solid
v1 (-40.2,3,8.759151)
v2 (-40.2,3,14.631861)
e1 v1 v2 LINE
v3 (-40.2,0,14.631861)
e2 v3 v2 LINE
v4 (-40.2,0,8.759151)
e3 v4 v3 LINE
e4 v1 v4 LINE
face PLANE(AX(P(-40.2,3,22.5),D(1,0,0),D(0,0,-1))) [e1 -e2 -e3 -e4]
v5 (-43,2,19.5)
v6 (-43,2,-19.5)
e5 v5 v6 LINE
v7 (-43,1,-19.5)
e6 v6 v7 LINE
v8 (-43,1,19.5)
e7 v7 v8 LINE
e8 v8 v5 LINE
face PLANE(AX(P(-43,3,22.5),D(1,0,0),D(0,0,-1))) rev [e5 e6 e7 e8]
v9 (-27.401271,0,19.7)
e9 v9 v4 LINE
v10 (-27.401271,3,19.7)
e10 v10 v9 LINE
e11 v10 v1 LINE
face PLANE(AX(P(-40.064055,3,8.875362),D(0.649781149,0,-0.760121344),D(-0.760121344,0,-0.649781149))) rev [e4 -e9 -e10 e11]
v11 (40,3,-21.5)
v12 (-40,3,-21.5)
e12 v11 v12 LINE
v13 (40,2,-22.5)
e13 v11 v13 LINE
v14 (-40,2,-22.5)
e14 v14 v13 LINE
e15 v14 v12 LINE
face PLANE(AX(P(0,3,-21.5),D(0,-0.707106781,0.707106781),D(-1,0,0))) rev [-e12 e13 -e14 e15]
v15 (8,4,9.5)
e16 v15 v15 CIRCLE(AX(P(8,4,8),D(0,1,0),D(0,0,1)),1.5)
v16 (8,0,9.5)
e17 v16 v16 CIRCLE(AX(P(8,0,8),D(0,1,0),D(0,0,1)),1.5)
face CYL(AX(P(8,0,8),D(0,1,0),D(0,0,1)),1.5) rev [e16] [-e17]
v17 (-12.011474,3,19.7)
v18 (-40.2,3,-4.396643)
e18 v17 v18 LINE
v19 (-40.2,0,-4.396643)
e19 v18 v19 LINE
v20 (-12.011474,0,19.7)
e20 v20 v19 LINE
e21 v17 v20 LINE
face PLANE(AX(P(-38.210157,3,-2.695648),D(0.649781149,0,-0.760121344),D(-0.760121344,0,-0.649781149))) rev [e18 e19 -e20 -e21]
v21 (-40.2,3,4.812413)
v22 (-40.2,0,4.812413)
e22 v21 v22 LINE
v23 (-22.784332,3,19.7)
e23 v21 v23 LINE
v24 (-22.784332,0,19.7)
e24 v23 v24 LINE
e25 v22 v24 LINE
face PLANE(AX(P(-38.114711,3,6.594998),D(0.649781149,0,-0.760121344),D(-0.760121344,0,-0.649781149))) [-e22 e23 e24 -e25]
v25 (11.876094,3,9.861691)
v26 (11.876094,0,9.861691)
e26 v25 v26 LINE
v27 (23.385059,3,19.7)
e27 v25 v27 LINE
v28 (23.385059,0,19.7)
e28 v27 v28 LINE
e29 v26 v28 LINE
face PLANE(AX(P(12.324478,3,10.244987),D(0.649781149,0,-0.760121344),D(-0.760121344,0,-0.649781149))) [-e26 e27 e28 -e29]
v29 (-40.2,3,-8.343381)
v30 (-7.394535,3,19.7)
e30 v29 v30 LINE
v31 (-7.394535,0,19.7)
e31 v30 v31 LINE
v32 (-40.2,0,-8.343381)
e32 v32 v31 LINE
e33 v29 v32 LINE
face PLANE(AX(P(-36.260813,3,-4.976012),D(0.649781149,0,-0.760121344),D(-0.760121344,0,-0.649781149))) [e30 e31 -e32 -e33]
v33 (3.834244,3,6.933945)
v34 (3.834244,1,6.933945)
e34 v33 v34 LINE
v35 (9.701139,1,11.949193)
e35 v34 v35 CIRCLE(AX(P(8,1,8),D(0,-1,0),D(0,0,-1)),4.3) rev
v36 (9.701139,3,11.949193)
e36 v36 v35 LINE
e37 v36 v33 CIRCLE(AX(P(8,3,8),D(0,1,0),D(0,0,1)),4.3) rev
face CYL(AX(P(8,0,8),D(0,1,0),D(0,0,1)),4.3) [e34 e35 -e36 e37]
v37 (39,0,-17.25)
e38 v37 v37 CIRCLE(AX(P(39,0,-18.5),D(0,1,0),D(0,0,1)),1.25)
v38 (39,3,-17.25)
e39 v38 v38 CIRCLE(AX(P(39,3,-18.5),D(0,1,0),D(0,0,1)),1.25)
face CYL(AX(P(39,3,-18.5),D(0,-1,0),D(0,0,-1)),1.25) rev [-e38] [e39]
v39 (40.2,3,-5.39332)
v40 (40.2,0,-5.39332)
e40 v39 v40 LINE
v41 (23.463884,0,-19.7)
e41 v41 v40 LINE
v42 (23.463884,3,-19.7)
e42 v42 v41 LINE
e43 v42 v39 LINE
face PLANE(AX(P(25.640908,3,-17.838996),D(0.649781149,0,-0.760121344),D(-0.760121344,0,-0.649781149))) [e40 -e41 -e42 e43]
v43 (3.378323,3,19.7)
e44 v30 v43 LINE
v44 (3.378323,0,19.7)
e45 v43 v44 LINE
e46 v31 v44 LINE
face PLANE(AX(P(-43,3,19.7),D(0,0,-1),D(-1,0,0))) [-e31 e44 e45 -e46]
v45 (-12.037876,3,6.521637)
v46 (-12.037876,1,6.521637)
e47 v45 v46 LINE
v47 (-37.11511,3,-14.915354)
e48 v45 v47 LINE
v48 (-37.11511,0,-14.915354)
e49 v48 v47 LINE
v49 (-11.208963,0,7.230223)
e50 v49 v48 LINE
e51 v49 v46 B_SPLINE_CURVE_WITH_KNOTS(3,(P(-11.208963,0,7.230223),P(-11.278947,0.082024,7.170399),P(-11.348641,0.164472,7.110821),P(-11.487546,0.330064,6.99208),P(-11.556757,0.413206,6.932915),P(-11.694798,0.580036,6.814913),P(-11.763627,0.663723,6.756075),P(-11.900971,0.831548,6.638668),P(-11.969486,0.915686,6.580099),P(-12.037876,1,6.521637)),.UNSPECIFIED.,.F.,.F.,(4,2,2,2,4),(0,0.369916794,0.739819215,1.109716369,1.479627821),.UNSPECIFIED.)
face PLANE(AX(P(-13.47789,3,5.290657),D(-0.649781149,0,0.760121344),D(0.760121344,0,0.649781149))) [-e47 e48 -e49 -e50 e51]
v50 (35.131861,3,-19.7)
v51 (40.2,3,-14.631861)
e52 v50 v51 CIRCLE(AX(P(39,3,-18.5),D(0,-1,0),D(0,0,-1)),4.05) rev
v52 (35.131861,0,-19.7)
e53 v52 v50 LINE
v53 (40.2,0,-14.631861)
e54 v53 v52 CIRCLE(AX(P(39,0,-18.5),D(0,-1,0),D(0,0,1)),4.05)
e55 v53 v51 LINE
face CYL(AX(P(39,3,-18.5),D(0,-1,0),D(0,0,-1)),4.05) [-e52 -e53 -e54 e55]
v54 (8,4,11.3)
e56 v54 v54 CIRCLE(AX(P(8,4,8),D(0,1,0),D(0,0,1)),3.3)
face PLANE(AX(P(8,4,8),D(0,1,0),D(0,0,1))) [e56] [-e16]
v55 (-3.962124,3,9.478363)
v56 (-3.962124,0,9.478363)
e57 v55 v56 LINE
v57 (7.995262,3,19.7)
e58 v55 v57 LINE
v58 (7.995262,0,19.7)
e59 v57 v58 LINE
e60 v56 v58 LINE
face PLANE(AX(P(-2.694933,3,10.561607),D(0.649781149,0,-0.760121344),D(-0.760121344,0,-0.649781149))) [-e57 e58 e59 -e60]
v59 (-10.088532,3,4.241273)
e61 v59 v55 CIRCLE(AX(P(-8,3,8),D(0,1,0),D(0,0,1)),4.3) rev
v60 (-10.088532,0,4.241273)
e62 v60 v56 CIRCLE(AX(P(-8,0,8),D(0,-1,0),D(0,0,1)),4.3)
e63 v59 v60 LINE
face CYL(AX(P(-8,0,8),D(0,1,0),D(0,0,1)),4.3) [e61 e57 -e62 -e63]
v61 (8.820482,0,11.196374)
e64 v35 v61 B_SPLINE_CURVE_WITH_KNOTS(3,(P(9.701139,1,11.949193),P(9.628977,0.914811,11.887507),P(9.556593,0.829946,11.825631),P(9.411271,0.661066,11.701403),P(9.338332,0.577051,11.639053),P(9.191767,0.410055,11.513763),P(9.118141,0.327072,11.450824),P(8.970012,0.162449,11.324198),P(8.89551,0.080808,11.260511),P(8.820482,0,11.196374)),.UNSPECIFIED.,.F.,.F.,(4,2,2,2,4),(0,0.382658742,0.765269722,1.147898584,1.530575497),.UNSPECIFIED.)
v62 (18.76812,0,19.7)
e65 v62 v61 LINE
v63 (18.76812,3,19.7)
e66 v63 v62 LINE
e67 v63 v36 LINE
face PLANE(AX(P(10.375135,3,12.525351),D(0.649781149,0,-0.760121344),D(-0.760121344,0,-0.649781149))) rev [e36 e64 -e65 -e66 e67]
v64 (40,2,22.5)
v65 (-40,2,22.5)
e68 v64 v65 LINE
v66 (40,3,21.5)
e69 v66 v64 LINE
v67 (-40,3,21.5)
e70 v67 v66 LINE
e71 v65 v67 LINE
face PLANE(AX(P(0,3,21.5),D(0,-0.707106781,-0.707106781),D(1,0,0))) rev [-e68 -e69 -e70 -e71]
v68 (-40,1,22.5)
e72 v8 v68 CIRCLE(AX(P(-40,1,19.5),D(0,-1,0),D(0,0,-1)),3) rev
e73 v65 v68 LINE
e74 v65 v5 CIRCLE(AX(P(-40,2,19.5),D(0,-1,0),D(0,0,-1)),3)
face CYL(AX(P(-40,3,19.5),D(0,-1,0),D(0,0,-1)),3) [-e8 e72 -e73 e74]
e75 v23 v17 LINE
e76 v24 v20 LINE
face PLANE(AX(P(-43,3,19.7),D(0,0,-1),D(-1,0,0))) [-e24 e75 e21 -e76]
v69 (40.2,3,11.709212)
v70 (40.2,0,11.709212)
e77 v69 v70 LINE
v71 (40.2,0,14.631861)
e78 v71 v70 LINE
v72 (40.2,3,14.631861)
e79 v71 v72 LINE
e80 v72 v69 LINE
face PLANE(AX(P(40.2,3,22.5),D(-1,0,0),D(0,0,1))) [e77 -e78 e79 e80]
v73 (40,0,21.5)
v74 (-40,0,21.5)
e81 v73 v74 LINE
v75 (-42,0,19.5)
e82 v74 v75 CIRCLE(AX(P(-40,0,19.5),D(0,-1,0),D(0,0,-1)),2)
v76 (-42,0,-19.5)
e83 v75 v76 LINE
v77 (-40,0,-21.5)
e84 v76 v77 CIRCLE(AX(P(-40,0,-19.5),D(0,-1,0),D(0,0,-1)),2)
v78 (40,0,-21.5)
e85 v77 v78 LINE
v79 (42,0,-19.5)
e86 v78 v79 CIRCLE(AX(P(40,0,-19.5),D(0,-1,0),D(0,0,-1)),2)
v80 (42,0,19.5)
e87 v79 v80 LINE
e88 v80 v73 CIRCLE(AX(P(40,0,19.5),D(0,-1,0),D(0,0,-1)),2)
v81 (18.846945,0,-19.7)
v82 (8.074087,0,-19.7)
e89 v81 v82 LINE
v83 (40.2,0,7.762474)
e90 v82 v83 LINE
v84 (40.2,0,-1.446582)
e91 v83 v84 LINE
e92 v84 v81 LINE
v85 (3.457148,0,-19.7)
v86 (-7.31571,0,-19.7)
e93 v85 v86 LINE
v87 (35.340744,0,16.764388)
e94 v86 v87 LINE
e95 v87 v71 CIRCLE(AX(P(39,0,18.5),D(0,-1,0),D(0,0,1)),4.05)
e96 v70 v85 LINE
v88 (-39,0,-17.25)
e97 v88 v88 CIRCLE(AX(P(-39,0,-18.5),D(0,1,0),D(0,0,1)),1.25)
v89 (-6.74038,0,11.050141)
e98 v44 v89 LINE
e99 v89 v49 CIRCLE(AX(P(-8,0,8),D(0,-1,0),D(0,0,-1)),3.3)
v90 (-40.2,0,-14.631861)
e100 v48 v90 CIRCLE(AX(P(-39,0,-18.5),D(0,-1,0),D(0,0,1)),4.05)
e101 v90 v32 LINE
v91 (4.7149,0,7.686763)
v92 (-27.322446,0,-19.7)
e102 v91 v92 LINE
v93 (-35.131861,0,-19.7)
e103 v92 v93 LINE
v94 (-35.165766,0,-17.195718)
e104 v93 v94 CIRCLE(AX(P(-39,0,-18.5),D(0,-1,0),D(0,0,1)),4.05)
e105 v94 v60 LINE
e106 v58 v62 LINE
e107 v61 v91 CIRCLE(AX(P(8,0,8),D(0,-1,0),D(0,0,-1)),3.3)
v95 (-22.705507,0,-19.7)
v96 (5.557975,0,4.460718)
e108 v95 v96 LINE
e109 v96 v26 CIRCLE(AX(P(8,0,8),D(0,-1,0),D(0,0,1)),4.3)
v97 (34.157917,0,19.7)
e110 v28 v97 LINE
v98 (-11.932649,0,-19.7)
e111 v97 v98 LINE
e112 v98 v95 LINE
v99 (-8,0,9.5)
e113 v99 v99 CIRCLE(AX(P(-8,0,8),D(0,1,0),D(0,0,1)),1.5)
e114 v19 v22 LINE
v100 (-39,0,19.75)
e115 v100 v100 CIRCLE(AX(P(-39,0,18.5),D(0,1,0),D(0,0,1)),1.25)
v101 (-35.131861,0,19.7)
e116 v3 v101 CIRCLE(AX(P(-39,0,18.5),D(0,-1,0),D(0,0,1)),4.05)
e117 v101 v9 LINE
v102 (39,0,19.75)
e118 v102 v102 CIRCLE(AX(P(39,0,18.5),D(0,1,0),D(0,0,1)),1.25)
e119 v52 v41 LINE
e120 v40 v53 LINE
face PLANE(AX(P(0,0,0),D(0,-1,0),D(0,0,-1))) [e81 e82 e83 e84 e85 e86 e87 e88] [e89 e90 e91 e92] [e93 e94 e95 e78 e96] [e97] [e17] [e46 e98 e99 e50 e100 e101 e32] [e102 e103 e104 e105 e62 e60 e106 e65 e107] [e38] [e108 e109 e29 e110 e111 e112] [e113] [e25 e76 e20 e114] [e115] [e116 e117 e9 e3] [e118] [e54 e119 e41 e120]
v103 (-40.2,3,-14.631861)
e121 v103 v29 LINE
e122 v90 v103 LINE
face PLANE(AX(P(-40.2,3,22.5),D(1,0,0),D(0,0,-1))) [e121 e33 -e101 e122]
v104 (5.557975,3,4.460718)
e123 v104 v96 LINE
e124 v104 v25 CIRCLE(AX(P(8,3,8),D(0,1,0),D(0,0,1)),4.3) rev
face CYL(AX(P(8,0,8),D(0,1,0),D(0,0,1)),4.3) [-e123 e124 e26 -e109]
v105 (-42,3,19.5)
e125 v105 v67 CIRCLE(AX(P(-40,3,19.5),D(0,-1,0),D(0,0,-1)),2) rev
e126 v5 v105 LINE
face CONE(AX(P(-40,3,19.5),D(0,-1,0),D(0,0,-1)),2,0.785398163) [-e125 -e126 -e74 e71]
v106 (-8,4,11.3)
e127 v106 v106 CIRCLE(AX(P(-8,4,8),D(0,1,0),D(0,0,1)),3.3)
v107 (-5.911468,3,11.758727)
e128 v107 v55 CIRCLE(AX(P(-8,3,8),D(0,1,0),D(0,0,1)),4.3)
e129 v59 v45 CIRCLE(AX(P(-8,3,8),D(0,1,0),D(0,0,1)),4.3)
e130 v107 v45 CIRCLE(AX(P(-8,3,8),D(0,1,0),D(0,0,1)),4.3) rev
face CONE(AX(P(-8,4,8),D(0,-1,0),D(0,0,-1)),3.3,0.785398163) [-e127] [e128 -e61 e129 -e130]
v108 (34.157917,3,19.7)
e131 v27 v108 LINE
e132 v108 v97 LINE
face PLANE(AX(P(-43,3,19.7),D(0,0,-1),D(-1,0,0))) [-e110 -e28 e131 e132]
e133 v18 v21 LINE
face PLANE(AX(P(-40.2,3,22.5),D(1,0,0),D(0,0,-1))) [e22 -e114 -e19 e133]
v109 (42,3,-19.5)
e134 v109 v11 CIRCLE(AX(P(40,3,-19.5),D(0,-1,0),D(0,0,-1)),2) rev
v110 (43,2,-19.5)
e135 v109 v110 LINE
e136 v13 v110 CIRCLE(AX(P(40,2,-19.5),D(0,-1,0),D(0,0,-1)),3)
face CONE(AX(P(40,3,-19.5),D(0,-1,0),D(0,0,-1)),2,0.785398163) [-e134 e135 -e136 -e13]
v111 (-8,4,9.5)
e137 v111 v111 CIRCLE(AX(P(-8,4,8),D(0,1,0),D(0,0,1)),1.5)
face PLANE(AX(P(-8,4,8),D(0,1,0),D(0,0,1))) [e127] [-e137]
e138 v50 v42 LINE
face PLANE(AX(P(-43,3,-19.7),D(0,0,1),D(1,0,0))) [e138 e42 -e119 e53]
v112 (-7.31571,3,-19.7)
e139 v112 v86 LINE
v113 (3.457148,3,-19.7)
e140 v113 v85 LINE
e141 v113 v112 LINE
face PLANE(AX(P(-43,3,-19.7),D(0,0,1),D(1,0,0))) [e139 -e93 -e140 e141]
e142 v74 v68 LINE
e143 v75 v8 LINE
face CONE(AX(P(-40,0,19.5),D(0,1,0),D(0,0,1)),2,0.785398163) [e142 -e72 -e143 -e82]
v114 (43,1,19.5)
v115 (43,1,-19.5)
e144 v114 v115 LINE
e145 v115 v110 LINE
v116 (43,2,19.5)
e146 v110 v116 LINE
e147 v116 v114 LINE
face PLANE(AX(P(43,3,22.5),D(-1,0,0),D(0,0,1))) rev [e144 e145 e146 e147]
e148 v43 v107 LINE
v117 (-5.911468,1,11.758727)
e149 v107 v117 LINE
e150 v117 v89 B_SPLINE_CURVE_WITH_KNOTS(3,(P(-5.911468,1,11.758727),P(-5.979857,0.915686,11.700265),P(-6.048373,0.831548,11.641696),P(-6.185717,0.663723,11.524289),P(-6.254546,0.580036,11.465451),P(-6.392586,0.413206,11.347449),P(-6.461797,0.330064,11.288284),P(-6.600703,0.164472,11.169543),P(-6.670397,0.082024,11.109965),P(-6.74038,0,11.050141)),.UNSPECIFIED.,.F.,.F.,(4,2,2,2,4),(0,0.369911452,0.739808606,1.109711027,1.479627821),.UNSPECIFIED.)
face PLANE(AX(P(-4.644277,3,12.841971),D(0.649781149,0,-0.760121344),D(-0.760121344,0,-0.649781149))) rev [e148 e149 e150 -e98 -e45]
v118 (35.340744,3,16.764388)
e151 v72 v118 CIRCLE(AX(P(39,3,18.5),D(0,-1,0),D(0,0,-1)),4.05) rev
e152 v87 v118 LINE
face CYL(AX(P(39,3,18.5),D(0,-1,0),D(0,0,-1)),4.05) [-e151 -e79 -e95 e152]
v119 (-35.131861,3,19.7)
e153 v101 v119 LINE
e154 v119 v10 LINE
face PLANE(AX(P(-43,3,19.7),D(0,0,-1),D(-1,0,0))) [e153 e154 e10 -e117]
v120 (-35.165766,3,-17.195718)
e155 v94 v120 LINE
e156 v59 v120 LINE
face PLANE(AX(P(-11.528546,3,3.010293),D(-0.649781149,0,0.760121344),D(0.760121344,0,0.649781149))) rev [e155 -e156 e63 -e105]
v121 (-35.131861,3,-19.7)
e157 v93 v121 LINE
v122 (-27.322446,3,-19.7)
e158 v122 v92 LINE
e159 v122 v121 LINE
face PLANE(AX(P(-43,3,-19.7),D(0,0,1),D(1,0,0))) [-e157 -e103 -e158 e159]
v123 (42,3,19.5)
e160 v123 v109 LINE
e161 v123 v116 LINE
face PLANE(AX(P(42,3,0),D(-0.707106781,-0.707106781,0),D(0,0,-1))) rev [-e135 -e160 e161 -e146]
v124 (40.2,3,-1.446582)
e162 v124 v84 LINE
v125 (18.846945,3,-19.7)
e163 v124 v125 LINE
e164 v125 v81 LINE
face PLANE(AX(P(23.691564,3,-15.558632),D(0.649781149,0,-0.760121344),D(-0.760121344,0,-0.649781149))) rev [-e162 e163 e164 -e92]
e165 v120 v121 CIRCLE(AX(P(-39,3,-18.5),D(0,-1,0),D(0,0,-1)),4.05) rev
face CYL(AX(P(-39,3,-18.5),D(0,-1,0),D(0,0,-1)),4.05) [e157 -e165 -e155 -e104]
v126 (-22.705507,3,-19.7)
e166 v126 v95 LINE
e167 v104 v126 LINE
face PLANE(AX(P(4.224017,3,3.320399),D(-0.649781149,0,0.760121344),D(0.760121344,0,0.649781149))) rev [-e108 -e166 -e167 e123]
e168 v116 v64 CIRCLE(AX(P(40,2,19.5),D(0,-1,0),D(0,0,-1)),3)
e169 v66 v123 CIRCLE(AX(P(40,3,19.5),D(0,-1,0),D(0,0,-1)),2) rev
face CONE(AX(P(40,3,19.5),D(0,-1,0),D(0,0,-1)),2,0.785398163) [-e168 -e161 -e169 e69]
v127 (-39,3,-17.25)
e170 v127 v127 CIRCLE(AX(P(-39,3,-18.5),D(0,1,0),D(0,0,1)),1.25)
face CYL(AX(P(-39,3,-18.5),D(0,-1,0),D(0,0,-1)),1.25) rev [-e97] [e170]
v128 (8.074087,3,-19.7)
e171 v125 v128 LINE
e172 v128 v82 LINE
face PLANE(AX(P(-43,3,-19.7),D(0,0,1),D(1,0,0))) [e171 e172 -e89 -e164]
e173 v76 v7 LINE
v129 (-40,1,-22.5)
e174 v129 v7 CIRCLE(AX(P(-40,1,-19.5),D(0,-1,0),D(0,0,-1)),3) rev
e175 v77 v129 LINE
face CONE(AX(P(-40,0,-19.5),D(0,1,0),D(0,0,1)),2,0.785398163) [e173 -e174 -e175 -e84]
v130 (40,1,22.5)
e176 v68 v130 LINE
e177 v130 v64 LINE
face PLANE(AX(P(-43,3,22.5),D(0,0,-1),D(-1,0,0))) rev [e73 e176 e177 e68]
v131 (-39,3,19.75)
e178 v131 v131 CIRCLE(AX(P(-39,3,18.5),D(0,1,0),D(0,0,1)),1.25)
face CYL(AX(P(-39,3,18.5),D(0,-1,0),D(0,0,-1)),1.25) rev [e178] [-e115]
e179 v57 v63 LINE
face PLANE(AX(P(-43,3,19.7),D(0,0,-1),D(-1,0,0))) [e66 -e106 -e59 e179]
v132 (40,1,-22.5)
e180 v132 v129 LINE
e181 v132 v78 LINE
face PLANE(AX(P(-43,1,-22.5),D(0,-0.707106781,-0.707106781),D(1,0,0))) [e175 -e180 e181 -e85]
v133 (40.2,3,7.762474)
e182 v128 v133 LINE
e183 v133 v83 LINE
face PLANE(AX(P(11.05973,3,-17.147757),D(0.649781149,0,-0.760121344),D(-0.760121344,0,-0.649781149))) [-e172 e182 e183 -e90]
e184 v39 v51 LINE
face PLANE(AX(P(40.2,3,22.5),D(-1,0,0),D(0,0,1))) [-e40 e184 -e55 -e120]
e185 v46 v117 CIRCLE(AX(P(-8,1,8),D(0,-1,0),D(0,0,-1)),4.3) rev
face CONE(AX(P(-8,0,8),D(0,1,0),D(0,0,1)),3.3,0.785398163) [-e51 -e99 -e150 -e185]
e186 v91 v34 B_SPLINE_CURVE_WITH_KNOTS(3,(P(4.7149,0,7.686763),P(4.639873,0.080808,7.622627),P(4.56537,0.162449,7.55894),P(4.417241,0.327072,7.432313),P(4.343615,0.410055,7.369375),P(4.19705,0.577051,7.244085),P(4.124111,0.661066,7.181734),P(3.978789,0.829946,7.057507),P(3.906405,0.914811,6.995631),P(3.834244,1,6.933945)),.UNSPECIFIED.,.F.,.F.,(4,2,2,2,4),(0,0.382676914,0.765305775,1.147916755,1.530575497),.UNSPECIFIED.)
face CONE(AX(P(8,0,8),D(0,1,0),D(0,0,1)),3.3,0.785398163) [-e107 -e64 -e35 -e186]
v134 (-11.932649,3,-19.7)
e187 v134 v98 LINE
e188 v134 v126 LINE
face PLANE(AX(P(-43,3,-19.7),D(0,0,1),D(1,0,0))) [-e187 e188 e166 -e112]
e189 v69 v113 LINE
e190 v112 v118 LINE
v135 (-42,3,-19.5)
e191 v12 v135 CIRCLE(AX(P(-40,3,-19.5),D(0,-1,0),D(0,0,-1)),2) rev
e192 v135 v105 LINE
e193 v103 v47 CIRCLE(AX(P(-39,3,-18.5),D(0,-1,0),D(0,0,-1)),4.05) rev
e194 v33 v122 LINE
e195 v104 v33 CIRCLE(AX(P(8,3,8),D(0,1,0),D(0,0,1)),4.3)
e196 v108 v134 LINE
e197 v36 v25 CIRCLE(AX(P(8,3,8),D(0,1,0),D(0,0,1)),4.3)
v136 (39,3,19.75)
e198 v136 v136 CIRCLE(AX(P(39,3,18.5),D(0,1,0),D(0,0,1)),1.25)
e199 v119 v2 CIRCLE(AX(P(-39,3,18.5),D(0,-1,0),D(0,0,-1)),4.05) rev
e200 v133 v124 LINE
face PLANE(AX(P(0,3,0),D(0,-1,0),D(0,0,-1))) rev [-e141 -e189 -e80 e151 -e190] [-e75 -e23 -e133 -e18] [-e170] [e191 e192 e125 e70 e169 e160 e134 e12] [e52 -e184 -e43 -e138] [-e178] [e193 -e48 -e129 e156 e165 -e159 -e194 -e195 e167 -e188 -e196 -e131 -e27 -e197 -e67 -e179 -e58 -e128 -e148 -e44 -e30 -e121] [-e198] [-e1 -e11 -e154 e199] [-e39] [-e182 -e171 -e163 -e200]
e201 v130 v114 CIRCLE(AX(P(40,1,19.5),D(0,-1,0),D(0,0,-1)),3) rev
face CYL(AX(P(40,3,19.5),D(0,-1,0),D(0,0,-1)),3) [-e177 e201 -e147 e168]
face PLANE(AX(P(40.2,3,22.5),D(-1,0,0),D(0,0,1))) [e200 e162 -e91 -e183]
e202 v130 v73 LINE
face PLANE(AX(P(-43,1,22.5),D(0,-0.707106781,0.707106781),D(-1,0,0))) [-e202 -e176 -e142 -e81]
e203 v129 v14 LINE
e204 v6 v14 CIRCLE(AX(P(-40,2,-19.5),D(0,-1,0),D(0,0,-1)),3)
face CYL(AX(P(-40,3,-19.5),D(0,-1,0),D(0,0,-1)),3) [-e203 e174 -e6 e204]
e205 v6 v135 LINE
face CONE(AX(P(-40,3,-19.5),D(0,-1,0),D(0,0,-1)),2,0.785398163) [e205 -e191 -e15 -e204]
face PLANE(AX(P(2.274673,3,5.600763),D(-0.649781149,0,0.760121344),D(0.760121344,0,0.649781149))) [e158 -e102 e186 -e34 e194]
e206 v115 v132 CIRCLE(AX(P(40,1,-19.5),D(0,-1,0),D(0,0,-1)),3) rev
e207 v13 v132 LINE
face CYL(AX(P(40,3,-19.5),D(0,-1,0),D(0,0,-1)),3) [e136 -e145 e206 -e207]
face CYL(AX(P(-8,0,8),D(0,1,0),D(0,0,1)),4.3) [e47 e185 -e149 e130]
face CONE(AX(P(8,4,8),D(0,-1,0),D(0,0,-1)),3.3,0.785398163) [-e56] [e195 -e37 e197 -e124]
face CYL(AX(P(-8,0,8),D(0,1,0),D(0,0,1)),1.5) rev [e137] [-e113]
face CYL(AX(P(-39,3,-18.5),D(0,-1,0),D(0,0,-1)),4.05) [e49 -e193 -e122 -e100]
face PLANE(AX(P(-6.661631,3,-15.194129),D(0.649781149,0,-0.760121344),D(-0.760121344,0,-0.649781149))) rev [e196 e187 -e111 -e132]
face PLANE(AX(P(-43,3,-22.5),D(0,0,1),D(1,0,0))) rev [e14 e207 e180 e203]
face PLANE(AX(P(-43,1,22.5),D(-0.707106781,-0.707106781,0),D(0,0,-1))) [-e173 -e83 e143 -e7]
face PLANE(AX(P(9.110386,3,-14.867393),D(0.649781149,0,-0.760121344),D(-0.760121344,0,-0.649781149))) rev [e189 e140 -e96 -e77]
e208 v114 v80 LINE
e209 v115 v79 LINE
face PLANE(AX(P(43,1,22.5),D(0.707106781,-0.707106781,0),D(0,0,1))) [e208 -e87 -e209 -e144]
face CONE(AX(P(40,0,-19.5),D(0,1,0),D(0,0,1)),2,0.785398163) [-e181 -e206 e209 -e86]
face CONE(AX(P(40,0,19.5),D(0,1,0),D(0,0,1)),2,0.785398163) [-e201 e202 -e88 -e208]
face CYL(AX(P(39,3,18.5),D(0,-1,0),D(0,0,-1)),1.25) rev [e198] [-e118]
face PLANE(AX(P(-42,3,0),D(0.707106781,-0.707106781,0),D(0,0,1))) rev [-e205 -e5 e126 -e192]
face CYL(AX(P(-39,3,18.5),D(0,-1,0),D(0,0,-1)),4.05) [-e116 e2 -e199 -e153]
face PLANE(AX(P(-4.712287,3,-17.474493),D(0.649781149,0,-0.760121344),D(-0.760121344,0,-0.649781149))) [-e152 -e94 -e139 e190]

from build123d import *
from build123d.topology import SkipClean

# Parameters (mm, degrees)
SKETCH1_W           = 86
SKETCH1_H           = 45
SKETCH1_R           = 1.25
BOSS_EXTRUDE1_DEPTH = 3
FILLET1_R           = 3
SKETCH2_R           = 1.5
CUT_EXTRUDE1_DEPTH  = 49.623553963
SHELL1_T            = -2.8
RIB1_REACH          = 50.624
CUT_EXTRUDE2_DEPTH  = 49.623553963
BOSS_EXTRUDE2_START = 1
SKETCH5_R           = 4.3
SKETCH5_R_2         = 1.5
BOSS_EXTRUDE2_DEPTH = 1
CHAMFER1_SIZE       = 1


with BuildPart() as part:
    # Sketch1 → Boss-Extrude1 (new body)
    with BuildSketch(Plane(origin=(0, 0, 0), x_dir=(1, 0, 0), z_dir=(0, 1, 0))):
        Rectangle(SKETCH1_W, SKETCH1_H)
        with Locations(Location((-39, 18.5, 0), (0, 0, 270))):
            Circle(SKETCH1_R, mode=Mode.SUBTRACT)
        with Locations(Location((39, 18.5, 0), (0, 0, 270))):
            Circle(SKETCH1_R, mode=Mode.SUBTRACT)
        with Locations(Location((39, -18.5, 0), (0, 0, 270))):
            Circle(SKETCH1_R, mode=Mode.SUBTRACT)
        with Locations(Location((-39, -18.5, 0), (0, 0, 270))):
            Circle(SKETCH1_R, mode=Mode.SUBTRACT)
    extrude(amount=BOSS_EXTRUDE1_DEPTH)

    # Fillet1
    fillet1_edges = [part.edges().sort_by_distance(p)[0] for p in [
        (43, 1.5, 22.5),
        (-43, 1.5, 22.5),
        (-43, 1.5, -22.5),
        (43, 1.5, -22.5),
    ]]
    fillet(fillet1_edges, radius=FILLET1_R)

    # Sketch2 → Cut-Extrude1 (cut, through all)
    with BuildSketch(Plane(origin=(0, 3, 0), x_dir=(1, 0, 0), z_dir=(0, 1, 0))):
        with Locations(Location((8, -8, 0), (0, 0, 270))):
            Circle(SKETCH2_R)
        with Locations(Location((-8, -8, 0), (0, 0, 270))):
            Circle(SKETCH2_R)
    extrude(amount=-CUT_EXTRUDE1_DEPTH, mode=Mode.SUBTRACT)

    # Shell1
    shell1_openings = [part.faces().sort_by_distance(p)[0] for p in [
        (0, 3, -0.029540883),
    ]]
    offset(amount=SHELL1_T, openings=shell1_openings)

    # Sketch3 walls → Rib1 (add, up to next)
    with BuildSketch(Plane(origin=(0, 3, 0), x_dir=(1, 0, 0), z_dir=(0, 1, 0)), mode=Mode.PRIVATE) as rib1_sk1:
        Polygon((-77.783977456, 23.369087639), (9.570170192, -51.304619221), (11.519513639, -49.024255188), (-75.834634008, 25.649451672), align=None)
    rib1_tool1 = extrude(rib1_sk1.sketch, amount=-RIB1_REACH, mode=Mode.PRIVATE) - part.part
    # Sketch3 walls → Rib1 (add, up to next)
    with BuildSketch(Plane(origin=(0, 3, 0), x_dir=(1, 0, 0), z_dir=(0, 1, 0)), mode=Mode.PRIVATE) as rib1_sk2:
        Polygon((-75.930079406, 34.940098058), (22.974178135, -49.60708984), (24.923521582, -47.326725807), (-73.980735959, 37.220462091), align=None)
    rib1_tool2 = extrude(rib1_sk2.sketch, amount=-RIB1_REACH, mode=Mode.PRIVATE) - part.part
    # Sketch3 walls → Rib1 (add, up to next)
    with BuildSketch(Plane(origin=(0, 3, 0), x_dir=(1, 0, 0), z_dir=(0, 1, 0)), mode=Mode.PRIVATE) as rib1_sk3:
        Polygon((26.191376207, -35.254742784), (-71.50019667, 48.255795321), (-73.449540118, 45.975431288), (24.24203276, -37.535106817), align=None)
    rib1_tool3 = extrude(rib1_sk3.sketch, amount=-RIB1_REACH, mode=Mode.PRIVATE) - part.part
    # Sketch3 walls → Rib1 (add, up to next)
    with BuildSketch(Plane(origin=(0, 3, 0), x_dir=(1, 0, 0), z_dir=(0, 1, 0)), mode=Mode.PRIVATE) as rib1_sk4:
        Polygon((41.943939257, -35.56484922), (-56.370030956, 48.47773822), (-58.319374403, 46.197374186), (39.994595809, -37.845213253), align=None)
    rib1_tool4 = extrude(rib1_sk4.sketch, amount=-RIB1_REACH, mode=Mode.PRIVATE) - part.part
    # Sketch3 walls → Rib1 (add, up to next)
    with BuildSketch(Plane(origin=(0, 3, 0), x_dir=(1, 0, 0), z_dir=(0, 1, 0)), mode=Mode.PRIVATE) as rib1_sk5:
        Polygon((-42.364199116, 19.402478496), (40.17566685, -51.155794023), (42.125010297, -48.87542999), (-40.414855668, 21.682842529), align=None)
    rib1_tool5 = extrude(rib1_sk5.sketch, amount=-RIB1_REACH, mode=Mode.PRIVATE) - part.part
    # Sketch3 walls → Rib1 (add, up to next)
    with BuildSketch(Plane(origin=(0, 3, 0), x_dir=(1, 0, 0), z_dir=(0, 1, 0)), mode=Mode.PRIVATE) as rib1_sk6:
        Polygon((-27.344787823, 19.719098562), (56.5220764, -51.973543436), (58.471419848, -49.693179403), (-25.395444376, 21.999462595), align=None)
    rib1_tool6 = extrude(rib1_sk6.sketch, amount=-RIB1_REACH, mode=Mode.PRIVATE) - part.part
    # Sketch3 walls → Rib1 (add, up to next)
    with BuildSketch(Plane(origin=(0, 3, 0), x_dir=(1, 0, 0), z_dir=(0, 1, 0)), mode=Mode.PRIVATE) as rib1_sk7:
        Polygon((-44.38155309, 47.438579234), (68.87285442, -49.375672346), (70.822197867, -47.095308313), (-42.432209642, 49.718943267), align=None)
    rib1_tool7 = extrude(rib1_sk7.sketch, amount=-RIB1_REACH, mode=Mode.PRIVATE) - part.part
    # Sketch3 walls → Rib1 (add, up to next)
    with BuildSketch(Plane(origin=(0, 3, 0), x_dir=(1, 0, 0), z_dir=(0, 1, 0)), mode=Mode.PRIVATE) as rib1_sk8:
        Polygon((-28.60953629, 47.11184298), (71.48616066, -38.453833446), (73.435504108, -36.173469413), (-26.660192843, 49.392207013), align=None)
    rib1_tool8 = extrude(rib1_sk8.sketch, amount=-RIB1_REACH, mode=Mode.PRIVATE) - part.part
    # Sketch3 walls → Rib1 (add, up to next)
    with BuildSketch(Plane(origin=(0, 3, 0), x_dir=(1, 0, 0), z_dir=(0, 1, 0)), mode=Mode.PRIVATE) as rib1_sk9:
        Polygon((-14.02835821, 47.803081759), (73.331762126, -26.875730786), (75.281105573, -24.595366753), (-12.079014763, 50.083445792), align=None)
    rib1_tool9 = extrude(rib1_sk9.sketch, amount=-RIB1_REACH, mode=Mode.PRIVATE) - part.part
    add(rib1_tool1.solids().sort_by_distance((-33.132231908, 3, 12.827583774))[0])
    add(rib1_tool2.solids().sort_by_distance((-25.503278912, 3, 6.193313875))[0])
    add(rib1_tool3.solids().sort_by_distance((-23.629081955, 3, -5.360344252))[0])
    add(rib1_tool4.solids().sort_by_distance((-8.187717573, 3, -5.316262483))[0])
    add(rib1_tool5.solids().sort_by_distance((-0.119594409, 3, 14.736475747))[0])
    add(rib1_tool6.solids().sort_by_distance((15.563316012, 3, 14.987040421))[0])
    add(rib1_tool7.solids().sort_by_distance((13.220322389, 3, -0.17163546))[0])
    add(rib1_tool8.solids().sort_by_distance((22.412983909, 3, -5.469186783))[0])
    add(rib1_tool9.solids().sort_by_distance((30.626373682, 3, -11.603857503))[0])

    # Sketch4 → Cut-Extrude2 (cut, through all)
    with SkipClean():  # the faces are left unmerged after this step: merging them gives an invalid solid
        with BuildSketch(Plane(origin=(0, 3, 0), x_dir=(1, 0, 0), z_dir=(0, 1, 0))):
            with BuildLine():
                Line((-27.401271161, -19.7), (-40.2, -8.759151154))
                Line((-40.2, -8.759151154), (-40.2, -14.631860913))
                ThreePointArc((-40.2, -14.631860913), (-36.136217536, -15.636217536), (-35.131860913, -19.7))
                Line((-35.131860913, -19.7), (-27.401271161, -19.7))
            make_face()
            Polygon((-12.011474131, -19.7), (-40.2, 4.396643081), (-40.2, -4.812412883), (-22.784332052, -19.7), align=None)
            with BuildLine():
                Line((3.378322898, -19.7), (-5.911467584, -11.758727491))
                ThreePointArc((-5.911467584, -11.758727491), (-10.794058942, -11.268521781), (-12.037875863, -6.521636542))
                Line((-12.037875863, -6.521636542), (-37.115109774, 14.915353736))
                ThreePointArc((-37.115109774, 14.915353736), (-38.629377954, 14.466993764), (-40.2, 14.631860913))
                Line((-40.2, 14.631860913), (-40.2, 8.343381352))
                Line((-40.2, 8.343381352), (-7.394535022, -19.7))
                Line((-7.394535022, -19.7), (3.378322898, -19.7))
            make_face()
            with BuildLine():
                Line((18.768119928, -19.7), (9.701138512, -11.949193305))
                ThreePointArc((9.701138512, -11.949193305), (5.205941058, -11.268521781), (3.834243685, -6.933944502))
                Line((3.834243685, -6.933944502), (-27.32244611, 19.7))
                Line((-27.32244611, 19.7), (-35.131860913, 19.7))
                ThreePointArc((-35.131860913, 19.7), (-34.950371139, 18.445172177), (-35.165766327, 17.195717769))
                Line((-35.165766327, 17.195717769), (-10.088532416, -4.241272509))
                ThreePointArc((-10.088532416, -4.241272509), (-5.205941058, -4.731478219), (-3.962124137, -9.478363458))
                Line((-3.962124137, -9.478363458), (7.995262007, -19.7))
                Line((7.995262007, -19.7), (18.768119928, -19.7))
            make_face()
            with BuildLine():
                Line((34.157916958, -19.7), (-11.93264908, 19.7))
                Line((-11.93264908, 19.7), (-22.705507001, 19.7))
                Line((-22.705507001, 19.7), (5.557974977, -4.460718465))
                ThreePointArc((5.557974977, -4.460718465), (10.794058942, -4.731478219), (11.876094115, -9.861691277))
                Line((11.876094115, -9.861691277), (23.385059037, -19.7))
                Line((23.385059037, -19.7), (34.157916958, -19.7))
            make_face()
            with BuildLine():
                Line((40.2, -11.709212236), (3.45714795, 19.7))
                Line((3.45714795, 19.7), (-7.315709971, 19.7))
                Line((-7.315709971, 19.7), (35.340744315, -16.764388341))
                ThreePointArc((35.340744315, -16.764388341), (37.372454935, -14.791415761), (40.2, -14.631860913))
                Line((40.2, -14.631860913), (40.2, -11.709212236))
            make_face()
            Polygon((40.2, 1.446581999), (18.84694498, 19.7), (8.074087059, 19.7), (40.2, -7.762473966), align=None)
            with BuildLine():
                Line((35.131860913, 19.7), (23.463884089, 19.7))
                Line((23.463884089, 19.7), (40.2, 5.393320269))
                Line((40.2, 5.393320269), (40.2, 14.631860913))
                ThreePointArc((40.2, 14.631860913), (36.136217536, 15.636217536), (35.131860913, 19.7))
            make_face()
        extrude(amount=-CUT_EXTRUDE2_DEPTH, mode=Mode.SUBTRACT)

    # Sketch5 → Boss-Extrude2 (add)
    # profile 1 of 2: a face of its own
    with SkipClean():  # the faces are left unmerged after this step: merging them gives an invalid solid
        with BuildSketch(Plane(origin=(0, 3, 0), x_dir=(1, 0, 0), z_dir=(0, 1, 0)).offset(BOSS_EXTRUDE2_START)):
            with Locations(Location((-8, -8, 0), (0, 0, 270))):
                Circle(SKETCH5_R)
            with Locations(Location((-8, -8, 0), (0, 0, 270))):
                Circle(SKETCH5_R_2, mode=Mode.SUBTRACT)
        # profile 2 of 2: a face of its own
        with BuildSketch(Plane(origin=(0, 3, 0), x_dir=(1, 0, 0), z_dir=(0, 1, 0)).offset(BOSS_EXTRUDE2_START)):
            with Locations(Location((8, -8, 0), (0, 0, 270))):
                Circle(SKETCH5_R)
            with Locations(Location((8, -8, 0), (0, 0, 270))):
                Circle(SKETCH5_R_2, mode=Mode.SUBTRACT)
        extrude(amount=-BOSS_EXTRUDE2_DEPTH)

    # Chamfer1
    chamfer1_edges = [part.edges().sort_by_distance(p)[0] for p in [
        (-8, 4, 3.7),
        (8, 4, 3.7),
        (-43, 0, 0),
        (-43, 3, 0),
        (43, 0, 0),
        (0, 0, 22.5),
        (0, 0, -22.5),
        (-42.121320344, 0, 21.621320344),
        (42.121320344, 0, 21.621320344),
        (42.121320344, 0, -21.621320344),
        (-42.121320344, 0, -21.621320344),
        (0, 3, -22.5),
        (43, 3, 0),
        (0, 3, 22.5),
        (-42.121320344, 3, 21.621320344),
        (42.121320344, 3, 21.621320344),
        (42.121320344, 3, -21.621320344),
        (-42.121320344, 3, -21.621320344),
        (5.205941058, 0, 11.268521781),
        (-10.794058942, 0, 11.268521781),
    ]]
    chamfer(chamfer1_edges, length=CHAMFER1_SIZE - 0.0001)  # a hair under: the kernel refuses the full size


solid = part.part
